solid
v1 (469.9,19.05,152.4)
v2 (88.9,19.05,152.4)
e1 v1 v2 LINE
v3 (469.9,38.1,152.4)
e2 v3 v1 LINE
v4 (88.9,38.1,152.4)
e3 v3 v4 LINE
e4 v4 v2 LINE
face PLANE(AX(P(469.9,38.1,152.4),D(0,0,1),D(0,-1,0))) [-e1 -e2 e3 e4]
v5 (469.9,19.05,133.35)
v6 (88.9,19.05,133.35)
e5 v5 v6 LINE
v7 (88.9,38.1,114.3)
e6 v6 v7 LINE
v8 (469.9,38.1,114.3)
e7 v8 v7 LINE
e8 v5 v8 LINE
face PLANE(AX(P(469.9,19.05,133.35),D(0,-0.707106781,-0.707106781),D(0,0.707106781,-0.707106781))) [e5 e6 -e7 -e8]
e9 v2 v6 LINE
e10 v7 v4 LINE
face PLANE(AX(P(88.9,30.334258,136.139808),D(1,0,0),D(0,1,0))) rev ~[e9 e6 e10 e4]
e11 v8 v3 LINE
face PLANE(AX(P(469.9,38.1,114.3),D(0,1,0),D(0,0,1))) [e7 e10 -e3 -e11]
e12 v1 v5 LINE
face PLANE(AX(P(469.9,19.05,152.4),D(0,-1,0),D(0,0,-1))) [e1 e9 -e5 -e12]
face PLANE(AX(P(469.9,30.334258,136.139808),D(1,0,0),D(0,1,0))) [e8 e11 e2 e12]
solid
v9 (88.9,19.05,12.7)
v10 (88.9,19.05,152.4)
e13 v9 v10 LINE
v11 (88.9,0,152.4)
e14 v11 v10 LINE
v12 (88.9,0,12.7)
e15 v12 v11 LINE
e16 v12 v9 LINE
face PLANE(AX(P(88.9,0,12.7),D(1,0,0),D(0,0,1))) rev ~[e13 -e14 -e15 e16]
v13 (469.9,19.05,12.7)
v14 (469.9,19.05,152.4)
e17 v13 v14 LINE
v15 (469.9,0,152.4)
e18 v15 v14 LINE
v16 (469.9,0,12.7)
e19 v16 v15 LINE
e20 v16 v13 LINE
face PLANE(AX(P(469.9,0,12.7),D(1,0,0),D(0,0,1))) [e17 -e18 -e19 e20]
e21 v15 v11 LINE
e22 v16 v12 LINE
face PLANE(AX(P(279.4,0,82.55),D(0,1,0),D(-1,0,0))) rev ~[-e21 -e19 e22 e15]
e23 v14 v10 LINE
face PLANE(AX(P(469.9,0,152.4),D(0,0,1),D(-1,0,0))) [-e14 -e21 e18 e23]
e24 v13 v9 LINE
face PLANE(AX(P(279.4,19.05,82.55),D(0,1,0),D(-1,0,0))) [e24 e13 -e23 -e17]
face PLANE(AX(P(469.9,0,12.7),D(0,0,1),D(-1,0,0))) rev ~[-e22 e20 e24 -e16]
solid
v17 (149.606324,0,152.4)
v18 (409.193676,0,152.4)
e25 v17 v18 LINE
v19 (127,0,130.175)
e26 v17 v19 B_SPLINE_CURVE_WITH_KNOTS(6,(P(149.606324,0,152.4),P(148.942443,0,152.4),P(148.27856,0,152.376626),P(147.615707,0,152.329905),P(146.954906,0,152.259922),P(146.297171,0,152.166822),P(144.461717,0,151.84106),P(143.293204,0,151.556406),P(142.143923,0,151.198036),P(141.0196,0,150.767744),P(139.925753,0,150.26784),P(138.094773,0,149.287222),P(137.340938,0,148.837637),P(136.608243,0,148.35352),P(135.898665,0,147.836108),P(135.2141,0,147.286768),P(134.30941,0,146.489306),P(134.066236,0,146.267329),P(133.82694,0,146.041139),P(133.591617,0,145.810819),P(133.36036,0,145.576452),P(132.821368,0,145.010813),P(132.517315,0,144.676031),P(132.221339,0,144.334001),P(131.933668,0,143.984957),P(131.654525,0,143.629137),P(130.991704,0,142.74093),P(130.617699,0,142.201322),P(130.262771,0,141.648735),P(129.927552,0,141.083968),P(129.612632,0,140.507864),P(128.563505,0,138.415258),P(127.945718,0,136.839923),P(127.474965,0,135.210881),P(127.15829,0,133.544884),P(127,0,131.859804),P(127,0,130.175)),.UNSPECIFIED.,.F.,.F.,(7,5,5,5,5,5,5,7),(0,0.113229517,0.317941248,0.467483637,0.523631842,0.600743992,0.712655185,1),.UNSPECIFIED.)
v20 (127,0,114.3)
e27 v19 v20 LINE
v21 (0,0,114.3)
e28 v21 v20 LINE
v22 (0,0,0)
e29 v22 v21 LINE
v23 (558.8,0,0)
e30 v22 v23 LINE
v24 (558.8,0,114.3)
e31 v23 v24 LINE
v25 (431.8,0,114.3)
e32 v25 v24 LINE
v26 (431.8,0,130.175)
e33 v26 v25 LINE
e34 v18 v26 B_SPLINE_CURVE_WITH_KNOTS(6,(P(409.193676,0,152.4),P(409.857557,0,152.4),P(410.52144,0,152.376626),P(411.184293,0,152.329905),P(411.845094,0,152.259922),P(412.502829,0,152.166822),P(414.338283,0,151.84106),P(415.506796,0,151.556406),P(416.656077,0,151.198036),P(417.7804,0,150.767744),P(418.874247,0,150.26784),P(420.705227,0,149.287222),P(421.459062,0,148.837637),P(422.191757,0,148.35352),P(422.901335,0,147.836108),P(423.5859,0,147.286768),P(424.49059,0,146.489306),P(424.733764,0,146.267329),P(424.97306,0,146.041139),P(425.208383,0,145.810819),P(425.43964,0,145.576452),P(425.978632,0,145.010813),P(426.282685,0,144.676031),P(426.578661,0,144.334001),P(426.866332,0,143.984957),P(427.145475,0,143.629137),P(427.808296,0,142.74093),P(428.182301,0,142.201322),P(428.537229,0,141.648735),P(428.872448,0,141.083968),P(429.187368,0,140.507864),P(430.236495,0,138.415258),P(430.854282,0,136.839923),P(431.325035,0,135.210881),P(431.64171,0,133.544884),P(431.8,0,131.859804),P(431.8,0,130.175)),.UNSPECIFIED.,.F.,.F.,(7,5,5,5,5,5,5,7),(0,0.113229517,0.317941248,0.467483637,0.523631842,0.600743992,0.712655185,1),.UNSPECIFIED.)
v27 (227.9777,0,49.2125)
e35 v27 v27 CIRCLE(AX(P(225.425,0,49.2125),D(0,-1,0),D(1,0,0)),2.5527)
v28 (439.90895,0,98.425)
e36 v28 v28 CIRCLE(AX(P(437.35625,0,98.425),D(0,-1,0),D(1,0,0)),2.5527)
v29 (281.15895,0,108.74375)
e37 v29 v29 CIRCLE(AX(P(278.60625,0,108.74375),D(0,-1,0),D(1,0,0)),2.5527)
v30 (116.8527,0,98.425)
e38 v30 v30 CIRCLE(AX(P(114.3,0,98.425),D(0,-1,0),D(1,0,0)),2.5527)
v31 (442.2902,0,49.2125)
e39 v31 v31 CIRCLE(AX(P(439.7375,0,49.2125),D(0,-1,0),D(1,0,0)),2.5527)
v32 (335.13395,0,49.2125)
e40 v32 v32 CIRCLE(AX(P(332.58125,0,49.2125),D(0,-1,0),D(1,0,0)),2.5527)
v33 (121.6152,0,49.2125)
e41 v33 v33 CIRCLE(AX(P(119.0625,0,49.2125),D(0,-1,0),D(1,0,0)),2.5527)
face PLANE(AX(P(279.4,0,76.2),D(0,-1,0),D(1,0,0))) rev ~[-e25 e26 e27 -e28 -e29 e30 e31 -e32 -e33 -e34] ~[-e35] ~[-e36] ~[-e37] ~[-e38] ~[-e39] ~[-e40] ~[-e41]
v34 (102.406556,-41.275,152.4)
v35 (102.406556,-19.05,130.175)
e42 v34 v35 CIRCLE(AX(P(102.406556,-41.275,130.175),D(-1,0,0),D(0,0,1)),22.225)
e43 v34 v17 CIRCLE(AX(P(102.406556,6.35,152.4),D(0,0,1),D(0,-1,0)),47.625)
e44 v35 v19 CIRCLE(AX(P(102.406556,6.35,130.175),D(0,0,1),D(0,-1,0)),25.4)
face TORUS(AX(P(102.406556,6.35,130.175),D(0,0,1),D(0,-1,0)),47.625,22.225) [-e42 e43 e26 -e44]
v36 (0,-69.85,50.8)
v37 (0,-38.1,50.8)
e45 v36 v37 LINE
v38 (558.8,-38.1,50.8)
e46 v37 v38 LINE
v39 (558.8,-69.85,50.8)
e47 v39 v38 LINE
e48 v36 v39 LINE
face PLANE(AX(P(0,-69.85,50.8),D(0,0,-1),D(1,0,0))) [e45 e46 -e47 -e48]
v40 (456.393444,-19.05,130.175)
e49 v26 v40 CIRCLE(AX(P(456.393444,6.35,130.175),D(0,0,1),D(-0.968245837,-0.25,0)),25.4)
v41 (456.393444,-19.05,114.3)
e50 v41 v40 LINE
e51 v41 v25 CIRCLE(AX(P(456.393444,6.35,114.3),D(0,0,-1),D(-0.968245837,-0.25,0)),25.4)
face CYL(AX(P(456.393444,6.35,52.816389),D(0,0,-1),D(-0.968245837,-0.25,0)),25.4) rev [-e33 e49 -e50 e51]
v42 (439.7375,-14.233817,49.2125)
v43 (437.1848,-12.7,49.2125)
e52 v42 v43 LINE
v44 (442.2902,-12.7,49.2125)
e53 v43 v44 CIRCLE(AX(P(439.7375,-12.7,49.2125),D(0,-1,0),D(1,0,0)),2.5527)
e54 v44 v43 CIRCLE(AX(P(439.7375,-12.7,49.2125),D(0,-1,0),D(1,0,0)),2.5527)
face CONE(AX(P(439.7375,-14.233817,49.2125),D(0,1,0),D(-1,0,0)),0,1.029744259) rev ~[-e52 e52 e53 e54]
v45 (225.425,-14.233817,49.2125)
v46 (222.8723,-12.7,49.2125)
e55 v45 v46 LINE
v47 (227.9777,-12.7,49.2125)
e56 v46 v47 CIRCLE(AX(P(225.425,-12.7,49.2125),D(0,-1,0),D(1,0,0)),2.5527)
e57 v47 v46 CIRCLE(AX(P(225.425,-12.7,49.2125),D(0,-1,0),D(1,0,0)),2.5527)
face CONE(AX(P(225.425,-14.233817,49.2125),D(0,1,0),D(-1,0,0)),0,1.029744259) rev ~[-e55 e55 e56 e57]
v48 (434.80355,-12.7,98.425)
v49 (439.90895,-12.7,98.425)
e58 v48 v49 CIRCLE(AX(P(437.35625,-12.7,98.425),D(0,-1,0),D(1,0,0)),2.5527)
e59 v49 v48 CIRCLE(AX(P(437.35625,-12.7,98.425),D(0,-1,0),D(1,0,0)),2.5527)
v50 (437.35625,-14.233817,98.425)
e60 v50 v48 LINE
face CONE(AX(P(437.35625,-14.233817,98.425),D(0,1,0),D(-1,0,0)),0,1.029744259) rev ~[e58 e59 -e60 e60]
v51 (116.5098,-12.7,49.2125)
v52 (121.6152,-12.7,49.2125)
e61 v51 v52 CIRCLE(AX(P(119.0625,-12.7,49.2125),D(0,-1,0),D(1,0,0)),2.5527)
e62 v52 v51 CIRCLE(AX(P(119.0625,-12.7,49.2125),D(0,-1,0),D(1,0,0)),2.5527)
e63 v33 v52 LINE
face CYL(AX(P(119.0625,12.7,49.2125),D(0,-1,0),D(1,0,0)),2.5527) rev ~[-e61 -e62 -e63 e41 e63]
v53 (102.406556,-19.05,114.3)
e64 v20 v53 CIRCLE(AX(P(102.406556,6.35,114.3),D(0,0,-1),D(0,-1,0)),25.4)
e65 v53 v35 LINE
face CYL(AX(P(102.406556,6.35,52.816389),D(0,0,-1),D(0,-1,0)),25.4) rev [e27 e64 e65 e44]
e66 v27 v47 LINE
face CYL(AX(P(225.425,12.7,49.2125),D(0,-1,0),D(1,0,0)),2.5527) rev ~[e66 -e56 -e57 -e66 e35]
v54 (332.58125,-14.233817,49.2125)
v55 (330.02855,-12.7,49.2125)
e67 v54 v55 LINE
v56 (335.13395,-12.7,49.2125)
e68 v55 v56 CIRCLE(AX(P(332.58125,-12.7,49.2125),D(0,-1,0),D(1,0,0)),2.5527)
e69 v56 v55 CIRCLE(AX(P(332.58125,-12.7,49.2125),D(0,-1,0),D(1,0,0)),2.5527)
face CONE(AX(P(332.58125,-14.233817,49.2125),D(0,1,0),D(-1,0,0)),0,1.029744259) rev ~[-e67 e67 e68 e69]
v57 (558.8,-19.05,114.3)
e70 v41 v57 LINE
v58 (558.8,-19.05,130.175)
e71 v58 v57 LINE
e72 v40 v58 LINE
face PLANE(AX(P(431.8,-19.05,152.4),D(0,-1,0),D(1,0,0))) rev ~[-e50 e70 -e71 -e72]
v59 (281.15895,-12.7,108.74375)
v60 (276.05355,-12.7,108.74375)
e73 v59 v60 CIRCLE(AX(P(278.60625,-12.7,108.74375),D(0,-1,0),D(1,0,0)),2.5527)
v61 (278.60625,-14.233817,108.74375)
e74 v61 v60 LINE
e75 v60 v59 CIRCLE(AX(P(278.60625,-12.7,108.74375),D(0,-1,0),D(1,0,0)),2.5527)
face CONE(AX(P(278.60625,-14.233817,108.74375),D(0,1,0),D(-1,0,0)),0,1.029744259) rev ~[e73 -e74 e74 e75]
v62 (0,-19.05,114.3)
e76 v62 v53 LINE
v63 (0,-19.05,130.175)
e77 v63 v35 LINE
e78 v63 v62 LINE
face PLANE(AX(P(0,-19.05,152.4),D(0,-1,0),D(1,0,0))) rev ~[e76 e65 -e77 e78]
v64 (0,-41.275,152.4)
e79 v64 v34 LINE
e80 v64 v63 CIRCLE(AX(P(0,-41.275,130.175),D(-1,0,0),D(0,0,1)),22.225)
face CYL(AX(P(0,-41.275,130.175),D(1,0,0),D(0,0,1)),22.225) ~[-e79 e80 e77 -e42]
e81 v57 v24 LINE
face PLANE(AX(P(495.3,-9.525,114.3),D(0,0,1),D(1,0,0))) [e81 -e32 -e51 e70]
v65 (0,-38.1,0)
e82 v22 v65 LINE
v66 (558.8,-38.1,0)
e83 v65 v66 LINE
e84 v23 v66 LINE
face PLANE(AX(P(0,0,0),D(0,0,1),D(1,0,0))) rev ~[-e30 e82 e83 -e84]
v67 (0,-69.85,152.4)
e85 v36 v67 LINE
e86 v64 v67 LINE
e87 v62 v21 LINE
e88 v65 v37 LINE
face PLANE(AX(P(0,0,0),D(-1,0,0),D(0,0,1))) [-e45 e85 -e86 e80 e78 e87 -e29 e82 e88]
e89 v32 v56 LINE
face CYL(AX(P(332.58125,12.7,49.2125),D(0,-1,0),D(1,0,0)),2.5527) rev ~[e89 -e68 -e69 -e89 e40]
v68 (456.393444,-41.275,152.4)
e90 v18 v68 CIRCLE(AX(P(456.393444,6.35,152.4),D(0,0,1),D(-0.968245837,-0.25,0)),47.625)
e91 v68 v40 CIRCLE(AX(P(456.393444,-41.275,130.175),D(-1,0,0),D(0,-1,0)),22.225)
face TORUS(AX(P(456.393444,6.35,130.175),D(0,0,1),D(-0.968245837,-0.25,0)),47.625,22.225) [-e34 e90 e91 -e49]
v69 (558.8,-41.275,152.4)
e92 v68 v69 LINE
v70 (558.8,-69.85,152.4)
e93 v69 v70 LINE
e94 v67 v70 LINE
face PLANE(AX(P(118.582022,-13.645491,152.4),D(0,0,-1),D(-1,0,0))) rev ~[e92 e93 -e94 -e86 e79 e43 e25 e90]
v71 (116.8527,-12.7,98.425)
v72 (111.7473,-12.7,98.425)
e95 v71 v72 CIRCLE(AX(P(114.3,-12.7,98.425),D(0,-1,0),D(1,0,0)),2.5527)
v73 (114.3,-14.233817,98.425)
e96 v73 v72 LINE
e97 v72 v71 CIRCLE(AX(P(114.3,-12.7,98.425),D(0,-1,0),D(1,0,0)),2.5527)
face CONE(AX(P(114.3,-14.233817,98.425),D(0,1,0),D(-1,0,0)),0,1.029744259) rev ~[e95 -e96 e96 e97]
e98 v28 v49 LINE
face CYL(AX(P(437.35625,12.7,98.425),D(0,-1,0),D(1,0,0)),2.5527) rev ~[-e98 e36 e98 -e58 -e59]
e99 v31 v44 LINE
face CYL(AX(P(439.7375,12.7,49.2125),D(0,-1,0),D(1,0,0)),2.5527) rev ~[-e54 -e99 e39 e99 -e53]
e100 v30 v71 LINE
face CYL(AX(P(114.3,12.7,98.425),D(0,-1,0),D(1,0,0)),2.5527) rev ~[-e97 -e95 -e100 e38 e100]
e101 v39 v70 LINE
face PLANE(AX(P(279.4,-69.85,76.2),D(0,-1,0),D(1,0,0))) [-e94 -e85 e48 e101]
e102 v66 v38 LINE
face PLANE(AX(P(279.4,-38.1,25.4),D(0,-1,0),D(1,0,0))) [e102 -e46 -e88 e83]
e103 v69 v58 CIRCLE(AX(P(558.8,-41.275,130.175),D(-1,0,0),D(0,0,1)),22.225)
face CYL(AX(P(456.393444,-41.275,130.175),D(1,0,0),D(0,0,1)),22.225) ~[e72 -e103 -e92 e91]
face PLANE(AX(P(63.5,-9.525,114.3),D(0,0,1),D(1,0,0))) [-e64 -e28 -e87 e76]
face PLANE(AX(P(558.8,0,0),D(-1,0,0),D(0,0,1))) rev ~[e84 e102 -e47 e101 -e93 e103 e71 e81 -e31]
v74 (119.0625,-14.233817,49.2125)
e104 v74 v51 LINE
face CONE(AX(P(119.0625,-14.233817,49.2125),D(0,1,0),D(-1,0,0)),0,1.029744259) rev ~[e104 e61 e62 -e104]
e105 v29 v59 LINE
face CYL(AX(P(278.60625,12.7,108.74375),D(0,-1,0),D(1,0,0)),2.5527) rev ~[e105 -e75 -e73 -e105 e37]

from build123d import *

# Parameters (mm, degrees)
F0_W        = 558.8
F0_H        = 152.4
F1_DEPTH    = 69.85
F2_W        = 558.8
F2_H        = 50.8
F3_DEPTH    = 31.75
F4_W        = 127
F4_H        = 19.05
F5_DEPTH    = 38.1
F6_T1_DEPTH = 99.583610621
F7_R        = 22.225
F9_D        = 5.1054
F9_DEPTH    = 12.7
F9_TIP      = 1.5338169022
F10_W       = 381
F10_H       = 139.7
F11_DEPTH   = 19.05
F13_DEPTH   = 381


# Not quite as in the source:
# - a fillet or chamfer that OpenCascade refuses, or shapes differently, is made with other operations: its cross-section is extruded or revolved along the edge and cut away or added


with BuildPart() as f1:
    # F0 (on Front) → F1 (new body)
    with BuildSketch(Plane.XZ):
        with Locations((279.4, 76.2)):
            Rectangle(F0_W, F0_H)
    extrude(amount=F1_DEPTH)

    # F2 (on face) → F3 (cut)
    with BuildSketch(Plane.XZ.offset(69.85)):
        with Locations((279.4, 25.4)):
            Rectangle(F2_W, F2_H)
    extrude(amount=-F3_DEPTH, mode=Mode.SUBTRACT)

    # F4 (on face) → F5 (cut)
    with BuildSketch(Plane.XY.offset(152.4)):
        with Locations((63.5, -9.525)):
            Rectangle(F4_W, F4_H)
        with Locations((495.3, -9.525)):
            Rectangle(F4_W, F4_H)
    extrude(amount=-F5_DEPTH, mode=Mode.SUBTRACT)

    # F6: fillet of radius 25.4 on 2 edges, made by hand

    # F6_s2 → F6_t1 (join)
    with BuildSketch(Plane.XY.offset(52.816389379)):
        with BuildLine():
            ThreePointArc((102.4065557516, -19.05), (117.9608156183, -13.7304631421), (127, 0))
            Line((127, 0), (127, -19.05))
            Line((127, -19.05), (102.4065557516, -19.05))
        make_face()
        with BuildLine():
            ThreePointArc((431.8, 0), (440.8391843817, -13.7304631421), (456.3934442484, -19.05))
            Line((456.3934442484, -19.05), (431.8, -19.05))
            Line((431.8, -19.05), (431.8, 0))
        make_face()
    extrude(amount=F6_T1_DEPTH)

    # F7
    f7_edges = [f1.edges().sort_by_distance(p)[0] for p in [
        (51.203278, -19.05, 152.4),
        (440.839184, -13.730463, 152.4),
        (507.596722, -19.05, 152.4),
        (117.960816, -13.730463, 152.4),
    ]]
    fillet(f7_edges, radius=F7_R)

    # F9
    with Locations(Plane(origin=(0, 0, 0), x_dir=(-1, 0, 0), z_dir=(0, 1, 0))):
        with Locations((-439.7375, 49.2125), (-437.35625, 98.425), (-332.58125, 49.2125), (-278.60625, 108.74375), (-225.425, 49.2125), (-119.0625, 49.2125), (-114.3, 98.425)):
            Hole(F9_D / 2, depth=F9_DEPTH)
            with Locations((0, 0, -(F9_DEPTH + F9_TIP / 2))):  # 118° drill point
                Cone(0, F9_D / 2, F9_TIP, mode=Mode.SUBTRACT)


with BuildPart() as f11:
    # F10 (on face) → F11 (new body)
    with BuildSketch(Plane(origin=(0, 0, 0), x_dir=(-1, 0, 0), z_dir=(0, 1, 0))):
        with Locations((-279.4, 82.55)):
            Rectangle(F10_W, F10_H)
    extrude(amount=F11_DEPTH)


with BuildPart() as f13:
    # F12 (on face) → F13 (new body)
    with BuildSketch(Plane.YZ.offset(469.9)):
        Polygon((38.1, 152.4), (19.05, 152.4), (19.05, 133.35), (38.1, 114.3), align=None)
    extrude(amount=-F13_DEPTH)


solid = Compound([f1.part, f11.part, f13.part])
